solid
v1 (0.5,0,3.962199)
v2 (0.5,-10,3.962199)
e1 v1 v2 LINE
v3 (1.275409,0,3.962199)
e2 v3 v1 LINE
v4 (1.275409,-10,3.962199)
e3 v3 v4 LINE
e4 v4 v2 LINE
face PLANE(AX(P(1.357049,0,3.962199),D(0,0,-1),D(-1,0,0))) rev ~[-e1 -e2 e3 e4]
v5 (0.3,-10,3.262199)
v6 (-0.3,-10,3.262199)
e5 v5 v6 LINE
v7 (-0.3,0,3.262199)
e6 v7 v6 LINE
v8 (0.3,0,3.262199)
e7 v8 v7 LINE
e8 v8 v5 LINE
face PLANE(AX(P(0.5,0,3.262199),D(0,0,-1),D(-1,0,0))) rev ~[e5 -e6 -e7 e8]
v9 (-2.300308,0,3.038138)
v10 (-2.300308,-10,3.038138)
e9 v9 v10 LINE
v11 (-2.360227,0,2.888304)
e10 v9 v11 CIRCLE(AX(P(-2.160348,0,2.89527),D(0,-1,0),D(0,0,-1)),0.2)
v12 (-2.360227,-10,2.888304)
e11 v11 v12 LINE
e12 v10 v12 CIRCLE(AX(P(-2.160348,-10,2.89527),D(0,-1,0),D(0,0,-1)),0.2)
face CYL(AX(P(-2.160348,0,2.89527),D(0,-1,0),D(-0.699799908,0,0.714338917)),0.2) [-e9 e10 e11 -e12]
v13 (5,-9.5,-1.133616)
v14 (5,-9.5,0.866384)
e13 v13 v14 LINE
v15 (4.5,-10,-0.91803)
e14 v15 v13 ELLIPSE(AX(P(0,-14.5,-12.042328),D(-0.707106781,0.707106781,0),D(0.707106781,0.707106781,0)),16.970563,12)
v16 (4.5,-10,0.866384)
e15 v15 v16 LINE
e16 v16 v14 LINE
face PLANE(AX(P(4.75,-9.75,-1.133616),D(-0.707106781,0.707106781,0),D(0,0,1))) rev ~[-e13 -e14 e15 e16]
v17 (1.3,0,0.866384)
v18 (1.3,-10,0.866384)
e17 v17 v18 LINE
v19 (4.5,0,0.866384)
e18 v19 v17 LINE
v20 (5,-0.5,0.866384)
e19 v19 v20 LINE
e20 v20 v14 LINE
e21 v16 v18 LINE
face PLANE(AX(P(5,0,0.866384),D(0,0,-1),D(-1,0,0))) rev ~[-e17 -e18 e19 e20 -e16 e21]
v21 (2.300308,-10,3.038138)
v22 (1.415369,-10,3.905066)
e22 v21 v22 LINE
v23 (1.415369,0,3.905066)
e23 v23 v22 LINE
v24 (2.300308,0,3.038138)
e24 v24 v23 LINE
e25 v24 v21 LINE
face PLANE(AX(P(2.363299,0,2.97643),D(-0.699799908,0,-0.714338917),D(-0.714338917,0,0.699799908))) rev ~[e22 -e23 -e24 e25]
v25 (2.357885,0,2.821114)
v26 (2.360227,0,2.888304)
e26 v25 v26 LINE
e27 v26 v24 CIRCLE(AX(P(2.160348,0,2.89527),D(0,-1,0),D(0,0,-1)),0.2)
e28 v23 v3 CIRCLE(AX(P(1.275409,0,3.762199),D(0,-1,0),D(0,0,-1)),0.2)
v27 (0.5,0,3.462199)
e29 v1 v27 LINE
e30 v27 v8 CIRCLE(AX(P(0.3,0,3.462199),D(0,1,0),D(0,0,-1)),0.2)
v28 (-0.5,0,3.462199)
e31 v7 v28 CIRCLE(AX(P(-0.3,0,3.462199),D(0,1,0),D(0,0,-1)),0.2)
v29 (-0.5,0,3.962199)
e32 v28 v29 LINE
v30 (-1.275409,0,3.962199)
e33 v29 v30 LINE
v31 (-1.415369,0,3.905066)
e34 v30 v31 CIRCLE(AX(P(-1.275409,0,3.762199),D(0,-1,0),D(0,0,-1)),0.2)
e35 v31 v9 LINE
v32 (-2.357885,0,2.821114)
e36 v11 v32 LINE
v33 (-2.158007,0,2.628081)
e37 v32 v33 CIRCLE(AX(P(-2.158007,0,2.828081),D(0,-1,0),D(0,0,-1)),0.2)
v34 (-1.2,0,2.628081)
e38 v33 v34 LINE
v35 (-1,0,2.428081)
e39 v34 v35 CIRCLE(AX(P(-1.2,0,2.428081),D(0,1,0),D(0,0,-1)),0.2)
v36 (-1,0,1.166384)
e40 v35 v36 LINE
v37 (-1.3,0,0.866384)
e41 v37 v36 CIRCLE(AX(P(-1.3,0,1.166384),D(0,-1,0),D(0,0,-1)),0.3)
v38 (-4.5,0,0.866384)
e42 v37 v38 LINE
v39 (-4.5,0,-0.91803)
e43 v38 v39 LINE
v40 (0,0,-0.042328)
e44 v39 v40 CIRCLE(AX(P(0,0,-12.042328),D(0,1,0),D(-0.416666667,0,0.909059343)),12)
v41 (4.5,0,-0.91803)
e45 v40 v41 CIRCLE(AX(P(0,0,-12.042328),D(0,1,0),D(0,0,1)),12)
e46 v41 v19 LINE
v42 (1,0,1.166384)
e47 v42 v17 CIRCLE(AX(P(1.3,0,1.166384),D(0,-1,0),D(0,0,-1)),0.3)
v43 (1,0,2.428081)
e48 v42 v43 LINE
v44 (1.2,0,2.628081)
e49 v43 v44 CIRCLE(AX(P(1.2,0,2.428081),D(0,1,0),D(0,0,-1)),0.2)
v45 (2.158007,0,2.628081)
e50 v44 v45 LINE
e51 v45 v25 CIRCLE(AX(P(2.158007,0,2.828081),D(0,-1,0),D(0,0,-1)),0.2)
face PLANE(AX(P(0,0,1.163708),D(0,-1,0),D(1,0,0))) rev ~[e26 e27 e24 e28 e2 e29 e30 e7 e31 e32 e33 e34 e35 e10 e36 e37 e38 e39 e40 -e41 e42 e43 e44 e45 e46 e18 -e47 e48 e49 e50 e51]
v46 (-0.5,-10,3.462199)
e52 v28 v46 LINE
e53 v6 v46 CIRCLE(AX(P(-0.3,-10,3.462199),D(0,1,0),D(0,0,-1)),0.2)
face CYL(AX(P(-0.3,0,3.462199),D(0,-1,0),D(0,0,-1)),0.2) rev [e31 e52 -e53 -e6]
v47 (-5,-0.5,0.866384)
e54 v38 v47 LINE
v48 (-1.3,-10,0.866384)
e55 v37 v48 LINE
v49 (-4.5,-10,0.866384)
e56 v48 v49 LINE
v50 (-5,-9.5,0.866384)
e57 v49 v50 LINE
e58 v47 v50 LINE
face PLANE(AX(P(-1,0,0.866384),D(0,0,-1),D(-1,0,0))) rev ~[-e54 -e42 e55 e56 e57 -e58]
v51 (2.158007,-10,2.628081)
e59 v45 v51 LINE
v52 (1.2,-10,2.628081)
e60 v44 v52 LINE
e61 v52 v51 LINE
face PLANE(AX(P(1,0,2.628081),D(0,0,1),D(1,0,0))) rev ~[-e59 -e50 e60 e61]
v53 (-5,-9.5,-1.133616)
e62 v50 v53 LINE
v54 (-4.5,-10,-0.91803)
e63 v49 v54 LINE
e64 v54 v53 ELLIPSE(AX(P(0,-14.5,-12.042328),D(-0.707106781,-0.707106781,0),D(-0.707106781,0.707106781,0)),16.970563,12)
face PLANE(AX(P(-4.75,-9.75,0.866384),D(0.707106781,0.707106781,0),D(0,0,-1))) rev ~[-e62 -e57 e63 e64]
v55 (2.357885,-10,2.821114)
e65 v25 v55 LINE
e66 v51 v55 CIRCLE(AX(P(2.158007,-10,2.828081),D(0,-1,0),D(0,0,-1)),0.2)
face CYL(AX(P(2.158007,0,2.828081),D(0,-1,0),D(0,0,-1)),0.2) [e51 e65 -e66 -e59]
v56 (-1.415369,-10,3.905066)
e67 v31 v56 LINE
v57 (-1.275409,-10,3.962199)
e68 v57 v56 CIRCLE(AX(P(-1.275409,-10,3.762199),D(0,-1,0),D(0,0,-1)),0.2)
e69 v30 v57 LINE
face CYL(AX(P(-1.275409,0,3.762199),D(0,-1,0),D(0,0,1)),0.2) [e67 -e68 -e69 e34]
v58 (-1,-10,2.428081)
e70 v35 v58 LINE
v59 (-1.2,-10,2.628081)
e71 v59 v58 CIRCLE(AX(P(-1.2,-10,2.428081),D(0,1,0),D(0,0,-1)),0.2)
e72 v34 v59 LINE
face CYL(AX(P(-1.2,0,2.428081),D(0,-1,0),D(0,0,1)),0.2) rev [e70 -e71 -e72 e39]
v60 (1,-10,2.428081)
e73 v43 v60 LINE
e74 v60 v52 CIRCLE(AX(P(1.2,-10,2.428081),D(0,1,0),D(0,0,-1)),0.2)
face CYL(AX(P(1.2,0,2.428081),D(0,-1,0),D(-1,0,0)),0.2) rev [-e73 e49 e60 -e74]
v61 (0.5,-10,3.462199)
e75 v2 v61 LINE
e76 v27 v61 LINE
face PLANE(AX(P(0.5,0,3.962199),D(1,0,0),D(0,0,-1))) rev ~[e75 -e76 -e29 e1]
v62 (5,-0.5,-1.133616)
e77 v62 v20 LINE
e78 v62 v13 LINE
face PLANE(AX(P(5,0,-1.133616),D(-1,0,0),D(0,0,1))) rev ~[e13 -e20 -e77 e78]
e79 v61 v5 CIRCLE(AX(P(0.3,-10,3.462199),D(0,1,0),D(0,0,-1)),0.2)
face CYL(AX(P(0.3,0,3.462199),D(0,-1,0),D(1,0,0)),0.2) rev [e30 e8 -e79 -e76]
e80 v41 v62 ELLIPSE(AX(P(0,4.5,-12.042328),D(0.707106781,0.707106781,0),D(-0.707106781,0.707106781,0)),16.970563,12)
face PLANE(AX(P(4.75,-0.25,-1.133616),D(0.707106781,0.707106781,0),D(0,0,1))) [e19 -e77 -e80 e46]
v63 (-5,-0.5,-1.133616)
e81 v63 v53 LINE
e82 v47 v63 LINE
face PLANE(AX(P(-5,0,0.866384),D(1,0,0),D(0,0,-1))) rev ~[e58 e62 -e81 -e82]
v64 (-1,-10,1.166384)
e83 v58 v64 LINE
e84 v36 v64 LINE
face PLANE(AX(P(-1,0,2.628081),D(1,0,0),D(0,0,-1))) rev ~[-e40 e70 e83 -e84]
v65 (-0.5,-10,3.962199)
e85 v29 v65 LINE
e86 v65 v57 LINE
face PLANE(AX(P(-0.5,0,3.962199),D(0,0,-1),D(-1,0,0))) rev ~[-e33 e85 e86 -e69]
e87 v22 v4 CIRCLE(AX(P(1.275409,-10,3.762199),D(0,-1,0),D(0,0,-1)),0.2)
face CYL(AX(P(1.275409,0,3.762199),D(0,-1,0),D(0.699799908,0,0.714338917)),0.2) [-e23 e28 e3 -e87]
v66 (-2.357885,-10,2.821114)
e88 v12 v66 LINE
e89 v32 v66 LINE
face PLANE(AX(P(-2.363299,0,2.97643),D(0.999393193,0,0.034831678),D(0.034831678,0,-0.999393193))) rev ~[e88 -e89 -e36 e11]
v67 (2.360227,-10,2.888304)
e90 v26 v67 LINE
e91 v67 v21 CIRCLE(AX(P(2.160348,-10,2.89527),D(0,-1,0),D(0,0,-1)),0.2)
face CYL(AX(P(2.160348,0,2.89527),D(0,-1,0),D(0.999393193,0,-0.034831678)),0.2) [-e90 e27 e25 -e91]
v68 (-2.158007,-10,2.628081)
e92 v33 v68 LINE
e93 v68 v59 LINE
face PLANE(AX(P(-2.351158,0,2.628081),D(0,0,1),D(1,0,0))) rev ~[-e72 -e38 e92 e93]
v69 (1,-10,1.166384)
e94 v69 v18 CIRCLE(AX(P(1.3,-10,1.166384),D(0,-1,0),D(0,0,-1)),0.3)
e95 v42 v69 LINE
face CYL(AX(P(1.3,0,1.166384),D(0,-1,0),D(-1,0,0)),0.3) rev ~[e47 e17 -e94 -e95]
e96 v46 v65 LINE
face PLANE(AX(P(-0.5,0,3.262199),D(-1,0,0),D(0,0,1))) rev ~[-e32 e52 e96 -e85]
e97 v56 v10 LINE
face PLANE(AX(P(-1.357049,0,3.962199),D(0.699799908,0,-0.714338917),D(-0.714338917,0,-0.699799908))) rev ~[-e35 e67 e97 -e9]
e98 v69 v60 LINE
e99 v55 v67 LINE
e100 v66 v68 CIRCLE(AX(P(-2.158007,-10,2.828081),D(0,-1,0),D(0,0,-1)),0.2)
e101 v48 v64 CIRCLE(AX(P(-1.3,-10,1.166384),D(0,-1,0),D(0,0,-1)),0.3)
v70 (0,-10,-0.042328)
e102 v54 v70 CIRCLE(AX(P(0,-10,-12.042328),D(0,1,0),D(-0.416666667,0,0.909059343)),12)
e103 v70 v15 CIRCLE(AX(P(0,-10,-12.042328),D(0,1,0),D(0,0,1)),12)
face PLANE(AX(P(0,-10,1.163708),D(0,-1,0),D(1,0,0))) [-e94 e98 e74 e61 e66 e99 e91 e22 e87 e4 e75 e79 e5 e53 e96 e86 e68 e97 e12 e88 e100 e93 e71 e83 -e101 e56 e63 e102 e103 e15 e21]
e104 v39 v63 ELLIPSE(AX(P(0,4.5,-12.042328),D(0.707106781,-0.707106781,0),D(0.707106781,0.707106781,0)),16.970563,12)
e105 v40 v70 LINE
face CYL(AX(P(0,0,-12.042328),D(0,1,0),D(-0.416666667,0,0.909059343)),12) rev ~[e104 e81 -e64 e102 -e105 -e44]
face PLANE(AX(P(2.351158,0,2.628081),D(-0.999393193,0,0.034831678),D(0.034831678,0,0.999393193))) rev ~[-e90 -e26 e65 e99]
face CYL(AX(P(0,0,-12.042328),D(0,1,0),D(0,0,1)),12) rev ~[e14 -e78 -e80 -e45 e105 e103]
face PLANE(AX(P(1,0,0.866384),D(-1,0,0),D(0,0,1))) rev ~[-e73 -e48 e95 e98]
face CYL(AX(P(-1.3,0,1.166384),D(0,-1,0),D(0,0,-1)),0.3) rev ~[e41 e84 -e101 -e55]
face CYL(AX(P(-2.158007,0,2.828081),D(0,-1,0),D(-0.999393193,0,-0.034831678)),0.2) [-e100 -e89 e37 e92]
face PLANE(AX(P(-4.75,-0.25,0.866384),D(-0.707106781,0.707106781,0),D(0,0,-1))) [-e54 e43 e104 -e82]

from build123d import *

# Parameters (mm, degrees)
F1_DEPTH = 10
F2_R     = 0.2
F3_R     = 0.3
F4_SIZE  = 0.5


# Not quite as in the source:
# - a feature names something its author has since deleted; it is built from what else it names


with BuildPart() as f1:
    # F0 (on Front) → F1 (new body)
    with BuildSketch(Plane.XZ):
        with BuildLine():
            Line((-5, 0.8663841993), (-5, -1.1336158007))
            ThreePointArc((-5, -1.1336158007), (-2.5588527336, -0.3183237919), (0, -0.0423279154))
            ThreePointArc((0, -0.0423279154), (2.5588527336, -0.3183237919), (5, -1.1336158007))
            Line((5, -1.1336158007), (5, 0.8663841993))
            Line((5, 0.8663841993), (1, 0.8663841993))
            Line((1, 0.8663841993), (1, 2.6280805469))
            Line((1, 2.6280805469), (2.3511576001, 2.6280805469))
            Line((2.3511576001, 2.6280805469), (2.363298554, 2.9764297366))
            Line((2.363298554, 2.9764297366), (1.357049332, 3.9621986704))
            Line((1.357049332, 3.9621986704), (0.5, 3.9621986704))
            Line((0.5, 3.9621986704), (0.5, 3.2621986704))
            Line((0.5, 3.2621986704), (0, 3.2621986704))
            Line((0, 3.2621986704), (-0.5, 3.2621986704))
            Line((-0.5, 3.2621986704), (-0.5, 3.9621986704))
            Line((-0.5, 3.9621986704), (-1.357049332, 3.9621986704))
            Line((-1.357049332, 3.9621986704), (-2.363298554, 2.9764297366))
            Line((-2.363298554, 2.9764297366), (-2.3511576001, 2.6280805469))
            Line((-2.3511576001, 2.6280805469), (-1, 2.6280805469))
            Line((-1, 2.6280805469), (-1, 0.8663841993))
            Line((-1, 0.8663841993), (-5, 0.8663841993))
        make_face()
    extrude(amount=F1_DEPTH)

    # F2
    f2_edges = [f1.edges().sort_by_distance(p)[0] for p in [
        (-0.5, -5, 3.262199),
        (0.5, -5, 3.262199),
        (2.351158, -5, 2.628081),
        (1, -5, 2.628081),
        (2.363299, -5, 2.97643),
        (1.357049, -5, 3.962199),
        (-1, -5, 2.628081),
        (-2.351158, -5, 2.628081),
        (-2.363299, -5, 2.97643),
        (-1.357049, -5, 3.962199),
    ]]
    fillet(f2_edges, radius=F2_R)

    # F3
    f3_edges = [f1.edges().sort_by_distance(p)[0] for p in [
        (-1, -5, 0.866384),
        (1, -5, 0.866384),
    ]]
    fillet(f3_edges, radius=F3_R)

    # F4
    f4_edges = [f1.edges().sort_by_distance(p)[0] for p in [
        (-5, -10, -0.133616),
        (5, -10, -0.133616),
        (5, 0, -0.133616),
        (-5, 0, -0.133616),
    ]]
    chamfer(f4_edges, length=F4_SIZE)


solid = f1.part
